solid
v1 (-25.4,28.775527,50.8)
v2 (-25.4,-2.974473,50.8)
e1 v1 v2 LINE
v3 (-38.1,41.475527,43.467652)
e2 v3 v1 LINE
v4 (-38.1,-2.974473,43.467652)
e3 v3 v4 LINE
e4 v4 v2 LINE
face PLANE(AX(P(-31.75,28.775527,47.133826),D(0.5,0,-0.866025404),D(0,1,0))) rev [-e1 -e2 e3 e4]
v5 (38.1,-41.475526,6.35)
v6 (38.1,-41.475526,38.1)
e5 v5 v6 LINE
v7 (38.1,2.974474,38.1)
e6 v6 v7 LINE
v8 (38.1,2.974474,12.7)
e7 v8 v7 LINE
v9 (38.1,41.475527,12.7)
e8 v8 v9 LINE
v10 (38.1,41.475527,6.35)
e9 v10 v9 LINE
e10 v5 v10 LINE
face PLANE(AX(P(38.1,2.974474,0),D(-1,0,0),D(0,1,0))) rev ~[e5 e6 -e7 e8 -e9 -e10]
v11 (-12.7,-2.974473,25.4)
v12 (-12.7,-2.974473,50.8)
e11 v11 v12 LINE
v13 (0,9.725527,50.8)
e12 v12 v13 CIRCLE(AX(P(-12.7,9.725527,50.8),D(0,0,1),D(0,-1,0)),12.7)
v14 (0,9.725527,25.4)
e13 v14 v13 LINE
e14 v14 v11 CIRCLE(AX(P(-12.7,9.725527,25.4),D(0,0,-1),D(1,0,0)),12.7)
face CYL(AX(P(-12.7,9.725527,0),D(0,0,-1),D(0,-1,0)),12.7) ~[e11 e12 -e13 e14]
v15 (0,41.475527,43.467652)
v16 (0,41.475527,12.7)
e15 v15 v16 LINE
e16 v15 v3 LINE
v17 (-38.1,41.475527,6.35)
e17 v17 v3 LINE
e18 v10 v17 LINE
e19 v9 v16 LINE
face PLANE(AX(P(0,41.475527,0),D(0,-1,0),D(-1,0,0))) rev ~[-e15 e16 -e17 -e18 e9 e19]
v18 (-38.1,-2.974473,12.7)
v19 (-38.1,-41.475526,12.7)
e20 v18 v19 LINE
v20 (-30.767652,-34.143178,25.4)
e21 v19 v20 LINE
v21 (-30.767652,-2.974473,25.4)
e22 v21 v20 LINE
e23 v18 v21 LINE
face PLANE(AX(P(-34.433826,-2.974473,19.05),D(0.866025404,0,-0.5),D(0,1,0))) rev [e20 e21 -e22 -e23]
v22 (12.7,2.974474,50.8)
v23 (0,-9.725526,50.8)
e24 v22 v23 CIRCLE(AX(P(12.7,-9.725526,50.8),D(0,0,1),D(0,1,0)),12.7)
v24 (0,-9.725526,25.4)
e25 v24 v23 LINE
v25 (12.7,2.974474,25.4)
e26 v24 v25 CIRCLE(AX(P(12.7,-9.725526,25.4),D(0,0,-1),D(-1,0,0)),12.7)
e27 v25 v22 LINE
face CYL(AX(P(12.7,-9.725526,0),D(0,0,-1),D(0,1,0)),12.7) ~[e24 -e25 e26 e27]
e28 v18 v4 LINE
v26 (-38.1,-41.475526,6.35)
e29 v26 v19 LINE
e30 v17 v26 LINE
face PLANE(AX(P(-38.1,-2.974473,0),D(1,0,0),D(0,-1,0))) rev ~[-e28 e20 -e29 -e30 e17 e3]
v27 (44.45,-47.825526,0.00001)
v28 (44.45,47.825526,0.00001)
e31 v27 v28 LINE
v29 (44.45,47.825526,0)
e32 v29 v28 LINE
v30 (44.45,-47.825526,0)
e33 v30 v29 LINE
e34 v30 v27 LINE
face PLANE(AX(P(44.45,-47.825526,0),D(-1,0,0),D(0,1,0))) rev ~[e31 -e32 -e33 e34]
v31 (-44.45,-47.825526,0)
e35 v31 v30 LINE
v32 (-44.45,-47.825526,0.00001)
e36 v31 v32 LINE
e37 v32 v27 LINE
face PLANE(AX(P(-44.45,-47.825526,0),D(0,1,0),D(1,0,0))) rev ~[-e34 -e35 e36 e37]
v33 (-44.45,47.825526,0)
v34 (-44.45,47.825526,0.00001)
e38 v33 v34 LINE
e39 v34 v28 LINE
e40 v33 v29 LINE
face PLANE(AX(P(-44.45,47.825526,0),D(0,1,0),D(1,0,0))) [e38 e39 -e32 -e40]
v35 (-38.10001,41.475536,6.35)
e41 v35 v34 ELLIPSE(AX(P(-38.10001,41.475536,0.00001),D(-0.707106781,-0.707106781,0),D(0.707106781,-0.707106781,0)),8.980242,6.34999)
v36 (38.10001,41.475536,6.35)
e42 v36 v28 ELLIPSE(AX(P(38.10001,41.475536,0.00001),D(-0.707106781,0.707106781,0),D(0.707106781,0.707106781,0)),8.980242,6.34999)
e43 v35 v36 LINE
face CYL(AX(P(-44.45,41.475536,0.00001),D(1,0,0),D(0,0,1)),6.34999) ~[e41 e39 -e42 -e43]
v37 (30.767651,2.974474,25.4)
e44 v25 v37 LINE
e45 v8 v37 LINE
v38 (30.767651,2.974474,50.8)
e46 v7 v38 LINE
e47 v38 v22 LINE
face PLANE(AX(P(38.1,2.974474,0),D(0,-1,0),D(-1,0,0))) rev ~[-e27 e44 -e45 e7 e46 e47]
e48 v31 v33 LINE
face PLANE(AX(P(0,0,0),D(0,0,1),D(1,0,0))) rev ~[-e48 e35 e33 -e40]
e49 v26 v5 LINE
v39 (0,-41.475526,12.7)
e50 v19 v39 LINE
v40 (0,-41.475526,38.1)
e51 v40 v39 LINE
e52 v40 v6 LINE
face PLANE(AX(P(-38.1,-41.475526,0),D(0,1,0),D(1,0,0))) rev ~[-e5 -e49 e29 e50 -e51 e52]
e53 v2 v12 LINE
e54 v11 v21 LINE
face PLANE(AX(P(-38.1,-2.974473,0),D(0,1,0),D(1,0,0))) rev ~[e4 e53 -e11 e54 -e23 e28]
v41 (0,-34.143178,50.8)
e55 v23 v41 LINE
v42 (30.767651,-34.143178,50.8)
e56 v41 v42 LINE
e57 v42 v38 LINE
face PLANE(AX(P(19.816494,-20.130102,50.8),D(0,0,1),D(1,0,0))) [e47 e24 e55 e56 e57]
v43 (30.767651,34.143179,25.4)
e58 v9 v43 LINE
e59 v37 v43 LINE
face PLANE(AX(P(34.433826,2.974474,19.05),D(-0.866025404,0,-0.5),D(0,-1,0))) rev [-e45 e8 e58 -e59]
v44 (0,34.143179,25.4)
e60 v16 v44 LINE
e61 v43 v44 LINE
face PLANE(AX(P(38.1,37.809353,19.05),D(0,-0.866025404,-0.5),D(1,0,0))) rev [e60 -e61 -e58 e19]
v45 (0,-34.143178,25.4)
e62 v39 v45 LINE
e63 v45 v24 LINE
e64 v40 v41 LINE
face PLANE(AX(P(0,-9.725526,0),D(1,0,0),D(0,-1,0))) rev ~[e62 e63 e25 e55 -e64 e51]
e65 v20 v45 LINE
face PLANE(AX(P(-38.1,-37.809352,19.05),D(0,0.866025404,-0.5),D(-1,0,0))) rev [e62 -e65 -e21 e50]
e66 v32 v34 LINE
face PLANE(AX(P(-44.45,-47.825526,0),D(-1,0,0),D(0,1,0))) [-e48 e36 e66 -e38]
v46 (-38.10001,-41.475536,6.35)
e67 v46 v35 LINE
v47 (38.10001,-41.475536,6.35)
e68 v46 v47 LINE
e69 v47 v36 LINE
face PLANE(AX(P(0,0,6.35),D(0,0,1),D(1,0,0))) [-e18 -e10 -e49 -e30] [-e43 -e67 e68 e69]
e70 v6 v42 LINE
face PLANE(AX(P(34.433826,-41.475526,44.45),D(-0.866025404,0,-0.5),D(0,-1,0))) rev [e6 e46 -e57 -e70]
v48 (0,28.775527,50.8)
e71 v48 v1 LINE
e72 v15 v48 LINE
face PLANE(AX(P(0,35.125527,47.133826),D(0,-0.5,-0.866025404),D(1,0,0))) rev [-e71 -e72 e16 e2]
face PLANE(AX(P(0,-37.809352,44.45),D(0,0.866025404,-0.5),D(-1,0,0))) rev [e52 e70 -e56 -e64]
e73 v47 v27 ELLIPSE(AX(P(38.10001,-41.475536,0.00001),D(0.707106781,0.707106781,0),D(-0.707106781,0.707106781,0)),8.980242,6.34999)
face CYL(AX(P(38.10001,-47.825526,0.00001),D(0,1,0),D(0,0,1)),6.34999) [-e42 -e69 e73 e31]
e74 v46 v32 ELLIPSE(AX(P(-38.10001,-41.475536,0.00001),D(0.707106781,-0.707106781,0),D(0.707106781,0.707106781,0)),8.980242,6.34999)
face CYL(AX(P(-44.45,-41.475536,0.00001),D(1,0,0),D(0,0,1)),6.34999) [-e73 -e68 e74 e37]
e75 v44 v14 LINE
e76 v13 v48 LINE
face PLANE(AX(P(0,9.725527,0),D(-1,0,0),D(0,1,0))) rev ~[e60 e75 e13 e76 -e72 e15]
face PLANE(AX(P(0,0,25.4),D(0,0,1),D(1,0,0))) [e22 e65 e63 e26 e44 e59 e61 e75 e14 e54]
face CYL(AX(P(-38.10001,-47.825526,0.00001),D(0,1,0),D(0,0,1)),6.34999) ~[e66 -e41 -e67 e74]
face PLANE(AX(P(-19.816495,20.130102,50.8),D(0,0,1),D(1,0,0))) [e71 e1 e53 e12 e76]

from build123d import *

# Parameters (mm, degrees)
F0_W        = 88.8999994576
F0_H        = 95.6510528922
F1_DEPTH    = 6.35
F2_DEPTH    = 25.4
F3_DEPTH    = 50.8
F4_R        = 6.34999
F5_SIZE2    = 7.3323484187
F5_SIZE     = 12.7
F6_C1_SIZE2 = 12.7
F6_C1_SIZE  = 7.3323484187
F6_C2_SIZE2 = 7.3323484187
F6_C2_SIZE  = 12.7
F6_C3_SIZE2 = 12.7
F6_C3_SIZE  = 7.3323484187
F6_C4_SIZE2 = 7.3323484187
F6_C4_SIZE  = 12.7


# Not quite as in the source:
# - a fillet or chamfer is up to 0.001 mm smaller than in the source, because OpenCascade refuses the exact size


with BuildPart() as f1:
    # F0 (on Top) → F1 (new body)
    with BuildSketch(Plane.XY):
        Rectangle(F0_W, F0_H)
        Polygon((-2.712e-07, 41.4755269885), (38.0999997288, 41.4755269885), (38.0999997288, 2.9744735539), (38.0999997288, -41.4755264461), (-2.712e-07, -41.4755264461), (-38.1000002712, -41.4755264461), (-38.1000002712, -2.9744730115), (-38.1000002712, 41.4755269885), align=None, mode=Mode.SUBTRACT)
    extrude(amount=F1_DEPTH)

    # F0 (on Top) → F2 (join)
    with BuildSketch(Plane.XY):
        with BuildLine():
            Line((38.0999997288, 2.9744735539), (38.0999997288, 41.4755269885))
            Line((38.0999997288, 41.4755269885), (-2.712e-07, 41.4755269885))
            Line((-2.712e-07, 41.4755269885), (-2.712e-07, 9.7255269885))
            ThreePointArc((-2.712e-07, 9.7255269885), (-3.7197441501, 0.7452708674), (-12.7000002712, -2.9744730115))
            Line((-12.7000002712, -2.9744730115), (-38.1000002712, -2.9744730115))
            Line((-38.1000002712, -2.9744730115), (-38.1000002712, -41.4755264461))
            Line((-38.1000002712, -41.4755264461), (-2.712e-07, -41.4755264461))
            Line((-2.712e-07, -41.4755264461), (-2.712e-07, -9.7255264461))
            ThreePointArc((-2.712e-07, -9.7255264461), (3.7197436077, -0.745270325), (12.6999997288, 2.9744735539))
            Line((12.6999997288, 2.9744735539), (38.0999997288, 2.9744735539))
        make_face()
    extrude(amount=F2_DEPTH)

    # F0 (on Top) → F3 (join)
    with BuildSketch(Plane.XY):
        with BuildLine():
            Line((-2.712e-07, 9.7255269885), (-2.712e-07, 41.4755269885))
            Line((-2.712e-07, 41.4755269885), (-38.1000002712, 41.4755269885))
            Line((-38.1000002712, 41.4755269885), (-38.1000002712, -2.9744730115))
            Line((-38.1000002712, -2.9744730115), (-12.7000002712, -2.9744730115))
            ThreePointArc((-12.7000002712, -2.9744730115), (-3.7197441501, 0.7452708674), (-2.712e-07, 9.7255269885))
        make_face()
        with BuildLine():
            Line((38.0999997288, -41.4755264461), (38.0999997288, 2.9744735539))
            Line((38.0999997288, 2.9744735539), (12.6999997288, 2.9744735539))
            ThreePointArc((12.6999997288, 2.9744735539), (3.7197436077, -0.745270325), (-2.712e-07, -9.7255264461))
            Line((-2.712e-07, -9.7255264461), (-2.712e-07, -41.4755264461))
            Line((-2.712e-07, -41.4755264461), (38.0999997288, -41.4755264461))
        make_face()
    extrude(amount=F3_DEPTH)

    # F4 (radius 6.35 in the source; OpenCascade refuses exactly that, so slightly less here)
    f4_edges = [f1.edges().sort_by_distance(p)[0] for p in [
        (44.45, 0, 6.35),
        (0, -47.825526, 6.35),
        (0, 47.825526, 6.35),
        (-44.45, 0, 6.35),
    ]]
    fillet(f4_edges, radius=F4_R)

    # F5
    f5_edges = [f1.edges().sort_by_distance(p)[0] for p in [
        (38.1, 22.225, 25.4),
        (19.05, 41.475527, 25.4),
        (-38.1, -22.225, 25.4),
        (-19.05, -41.475526, 25.4),
    ]]
    chamfer(f5_edges, length=F5_SIZE, length2=F5_SIZE2)

    # F6: chamfer of 12.7 x 7.3323484187 on 4 edges, made by hand

    # F6_c1
    f6_c1_edges = [f1.edges().sort_by_distance(p)[0] for p in [
        (-19.0500002712, 41.4755269885, 50.8),
    ]]
    f6_c1_side = f1.faces().sort_by_distance((-19.0500002712, 41.4755269885, 50.6533530316))[0]
    chamfer(f6_c1_edges, length=F6_C1_SIZE, length2=F6_C1_SIZE2, reference=f6_c1_side)

    # F6_c2
    f6_c2_edges = [f1.edges().sort_by_distance(p)[0] for p in [
        (38.0999997288, -19.2505264461, 50.8),
    ]]
    f6_c2_side = f1.faces().sort_by_distance((38.0999997288, -19.2505264461, 50.6533530316))[0]
    chamfer(f6_c2_edges, length=F6_C2_SIZE, length2=F6_C2_SIZE2, reference=f6_c2_side)

    # F6_c3
    f6_c3_edges = [f1.edges().sort_by_distance(p)[0] for p in [
        (-38.1000002712, 12.9005269885, 50.8),
    ]]
    f6_c3_side = f1.faces().sort_by_distance((-38.1000002712, 12.9005269885, 50.6533530316))[0]
    chamfer(f6_c3_edges, length=F6_C3_SIZE, length2=F6_C3_SIZE2, reference=f6_c3_side)

    # F6_c4
    f6_c4_edges = [f1.edges().sort_by_distance(p)[0] for p in [
        (15.3838255194, -41.4755264461, 50.8),
    ]]
    f6_c4_side = f1.faces().sort_by_distance((15.3838255194, -41.4755264461, 50.6533530316))[0]
    chamfer(f6_c4_edges, length=F6_C4_SIZE, length2=F6_C4_SIZE2, reference=f6_c4_side)


solid = f1.part
